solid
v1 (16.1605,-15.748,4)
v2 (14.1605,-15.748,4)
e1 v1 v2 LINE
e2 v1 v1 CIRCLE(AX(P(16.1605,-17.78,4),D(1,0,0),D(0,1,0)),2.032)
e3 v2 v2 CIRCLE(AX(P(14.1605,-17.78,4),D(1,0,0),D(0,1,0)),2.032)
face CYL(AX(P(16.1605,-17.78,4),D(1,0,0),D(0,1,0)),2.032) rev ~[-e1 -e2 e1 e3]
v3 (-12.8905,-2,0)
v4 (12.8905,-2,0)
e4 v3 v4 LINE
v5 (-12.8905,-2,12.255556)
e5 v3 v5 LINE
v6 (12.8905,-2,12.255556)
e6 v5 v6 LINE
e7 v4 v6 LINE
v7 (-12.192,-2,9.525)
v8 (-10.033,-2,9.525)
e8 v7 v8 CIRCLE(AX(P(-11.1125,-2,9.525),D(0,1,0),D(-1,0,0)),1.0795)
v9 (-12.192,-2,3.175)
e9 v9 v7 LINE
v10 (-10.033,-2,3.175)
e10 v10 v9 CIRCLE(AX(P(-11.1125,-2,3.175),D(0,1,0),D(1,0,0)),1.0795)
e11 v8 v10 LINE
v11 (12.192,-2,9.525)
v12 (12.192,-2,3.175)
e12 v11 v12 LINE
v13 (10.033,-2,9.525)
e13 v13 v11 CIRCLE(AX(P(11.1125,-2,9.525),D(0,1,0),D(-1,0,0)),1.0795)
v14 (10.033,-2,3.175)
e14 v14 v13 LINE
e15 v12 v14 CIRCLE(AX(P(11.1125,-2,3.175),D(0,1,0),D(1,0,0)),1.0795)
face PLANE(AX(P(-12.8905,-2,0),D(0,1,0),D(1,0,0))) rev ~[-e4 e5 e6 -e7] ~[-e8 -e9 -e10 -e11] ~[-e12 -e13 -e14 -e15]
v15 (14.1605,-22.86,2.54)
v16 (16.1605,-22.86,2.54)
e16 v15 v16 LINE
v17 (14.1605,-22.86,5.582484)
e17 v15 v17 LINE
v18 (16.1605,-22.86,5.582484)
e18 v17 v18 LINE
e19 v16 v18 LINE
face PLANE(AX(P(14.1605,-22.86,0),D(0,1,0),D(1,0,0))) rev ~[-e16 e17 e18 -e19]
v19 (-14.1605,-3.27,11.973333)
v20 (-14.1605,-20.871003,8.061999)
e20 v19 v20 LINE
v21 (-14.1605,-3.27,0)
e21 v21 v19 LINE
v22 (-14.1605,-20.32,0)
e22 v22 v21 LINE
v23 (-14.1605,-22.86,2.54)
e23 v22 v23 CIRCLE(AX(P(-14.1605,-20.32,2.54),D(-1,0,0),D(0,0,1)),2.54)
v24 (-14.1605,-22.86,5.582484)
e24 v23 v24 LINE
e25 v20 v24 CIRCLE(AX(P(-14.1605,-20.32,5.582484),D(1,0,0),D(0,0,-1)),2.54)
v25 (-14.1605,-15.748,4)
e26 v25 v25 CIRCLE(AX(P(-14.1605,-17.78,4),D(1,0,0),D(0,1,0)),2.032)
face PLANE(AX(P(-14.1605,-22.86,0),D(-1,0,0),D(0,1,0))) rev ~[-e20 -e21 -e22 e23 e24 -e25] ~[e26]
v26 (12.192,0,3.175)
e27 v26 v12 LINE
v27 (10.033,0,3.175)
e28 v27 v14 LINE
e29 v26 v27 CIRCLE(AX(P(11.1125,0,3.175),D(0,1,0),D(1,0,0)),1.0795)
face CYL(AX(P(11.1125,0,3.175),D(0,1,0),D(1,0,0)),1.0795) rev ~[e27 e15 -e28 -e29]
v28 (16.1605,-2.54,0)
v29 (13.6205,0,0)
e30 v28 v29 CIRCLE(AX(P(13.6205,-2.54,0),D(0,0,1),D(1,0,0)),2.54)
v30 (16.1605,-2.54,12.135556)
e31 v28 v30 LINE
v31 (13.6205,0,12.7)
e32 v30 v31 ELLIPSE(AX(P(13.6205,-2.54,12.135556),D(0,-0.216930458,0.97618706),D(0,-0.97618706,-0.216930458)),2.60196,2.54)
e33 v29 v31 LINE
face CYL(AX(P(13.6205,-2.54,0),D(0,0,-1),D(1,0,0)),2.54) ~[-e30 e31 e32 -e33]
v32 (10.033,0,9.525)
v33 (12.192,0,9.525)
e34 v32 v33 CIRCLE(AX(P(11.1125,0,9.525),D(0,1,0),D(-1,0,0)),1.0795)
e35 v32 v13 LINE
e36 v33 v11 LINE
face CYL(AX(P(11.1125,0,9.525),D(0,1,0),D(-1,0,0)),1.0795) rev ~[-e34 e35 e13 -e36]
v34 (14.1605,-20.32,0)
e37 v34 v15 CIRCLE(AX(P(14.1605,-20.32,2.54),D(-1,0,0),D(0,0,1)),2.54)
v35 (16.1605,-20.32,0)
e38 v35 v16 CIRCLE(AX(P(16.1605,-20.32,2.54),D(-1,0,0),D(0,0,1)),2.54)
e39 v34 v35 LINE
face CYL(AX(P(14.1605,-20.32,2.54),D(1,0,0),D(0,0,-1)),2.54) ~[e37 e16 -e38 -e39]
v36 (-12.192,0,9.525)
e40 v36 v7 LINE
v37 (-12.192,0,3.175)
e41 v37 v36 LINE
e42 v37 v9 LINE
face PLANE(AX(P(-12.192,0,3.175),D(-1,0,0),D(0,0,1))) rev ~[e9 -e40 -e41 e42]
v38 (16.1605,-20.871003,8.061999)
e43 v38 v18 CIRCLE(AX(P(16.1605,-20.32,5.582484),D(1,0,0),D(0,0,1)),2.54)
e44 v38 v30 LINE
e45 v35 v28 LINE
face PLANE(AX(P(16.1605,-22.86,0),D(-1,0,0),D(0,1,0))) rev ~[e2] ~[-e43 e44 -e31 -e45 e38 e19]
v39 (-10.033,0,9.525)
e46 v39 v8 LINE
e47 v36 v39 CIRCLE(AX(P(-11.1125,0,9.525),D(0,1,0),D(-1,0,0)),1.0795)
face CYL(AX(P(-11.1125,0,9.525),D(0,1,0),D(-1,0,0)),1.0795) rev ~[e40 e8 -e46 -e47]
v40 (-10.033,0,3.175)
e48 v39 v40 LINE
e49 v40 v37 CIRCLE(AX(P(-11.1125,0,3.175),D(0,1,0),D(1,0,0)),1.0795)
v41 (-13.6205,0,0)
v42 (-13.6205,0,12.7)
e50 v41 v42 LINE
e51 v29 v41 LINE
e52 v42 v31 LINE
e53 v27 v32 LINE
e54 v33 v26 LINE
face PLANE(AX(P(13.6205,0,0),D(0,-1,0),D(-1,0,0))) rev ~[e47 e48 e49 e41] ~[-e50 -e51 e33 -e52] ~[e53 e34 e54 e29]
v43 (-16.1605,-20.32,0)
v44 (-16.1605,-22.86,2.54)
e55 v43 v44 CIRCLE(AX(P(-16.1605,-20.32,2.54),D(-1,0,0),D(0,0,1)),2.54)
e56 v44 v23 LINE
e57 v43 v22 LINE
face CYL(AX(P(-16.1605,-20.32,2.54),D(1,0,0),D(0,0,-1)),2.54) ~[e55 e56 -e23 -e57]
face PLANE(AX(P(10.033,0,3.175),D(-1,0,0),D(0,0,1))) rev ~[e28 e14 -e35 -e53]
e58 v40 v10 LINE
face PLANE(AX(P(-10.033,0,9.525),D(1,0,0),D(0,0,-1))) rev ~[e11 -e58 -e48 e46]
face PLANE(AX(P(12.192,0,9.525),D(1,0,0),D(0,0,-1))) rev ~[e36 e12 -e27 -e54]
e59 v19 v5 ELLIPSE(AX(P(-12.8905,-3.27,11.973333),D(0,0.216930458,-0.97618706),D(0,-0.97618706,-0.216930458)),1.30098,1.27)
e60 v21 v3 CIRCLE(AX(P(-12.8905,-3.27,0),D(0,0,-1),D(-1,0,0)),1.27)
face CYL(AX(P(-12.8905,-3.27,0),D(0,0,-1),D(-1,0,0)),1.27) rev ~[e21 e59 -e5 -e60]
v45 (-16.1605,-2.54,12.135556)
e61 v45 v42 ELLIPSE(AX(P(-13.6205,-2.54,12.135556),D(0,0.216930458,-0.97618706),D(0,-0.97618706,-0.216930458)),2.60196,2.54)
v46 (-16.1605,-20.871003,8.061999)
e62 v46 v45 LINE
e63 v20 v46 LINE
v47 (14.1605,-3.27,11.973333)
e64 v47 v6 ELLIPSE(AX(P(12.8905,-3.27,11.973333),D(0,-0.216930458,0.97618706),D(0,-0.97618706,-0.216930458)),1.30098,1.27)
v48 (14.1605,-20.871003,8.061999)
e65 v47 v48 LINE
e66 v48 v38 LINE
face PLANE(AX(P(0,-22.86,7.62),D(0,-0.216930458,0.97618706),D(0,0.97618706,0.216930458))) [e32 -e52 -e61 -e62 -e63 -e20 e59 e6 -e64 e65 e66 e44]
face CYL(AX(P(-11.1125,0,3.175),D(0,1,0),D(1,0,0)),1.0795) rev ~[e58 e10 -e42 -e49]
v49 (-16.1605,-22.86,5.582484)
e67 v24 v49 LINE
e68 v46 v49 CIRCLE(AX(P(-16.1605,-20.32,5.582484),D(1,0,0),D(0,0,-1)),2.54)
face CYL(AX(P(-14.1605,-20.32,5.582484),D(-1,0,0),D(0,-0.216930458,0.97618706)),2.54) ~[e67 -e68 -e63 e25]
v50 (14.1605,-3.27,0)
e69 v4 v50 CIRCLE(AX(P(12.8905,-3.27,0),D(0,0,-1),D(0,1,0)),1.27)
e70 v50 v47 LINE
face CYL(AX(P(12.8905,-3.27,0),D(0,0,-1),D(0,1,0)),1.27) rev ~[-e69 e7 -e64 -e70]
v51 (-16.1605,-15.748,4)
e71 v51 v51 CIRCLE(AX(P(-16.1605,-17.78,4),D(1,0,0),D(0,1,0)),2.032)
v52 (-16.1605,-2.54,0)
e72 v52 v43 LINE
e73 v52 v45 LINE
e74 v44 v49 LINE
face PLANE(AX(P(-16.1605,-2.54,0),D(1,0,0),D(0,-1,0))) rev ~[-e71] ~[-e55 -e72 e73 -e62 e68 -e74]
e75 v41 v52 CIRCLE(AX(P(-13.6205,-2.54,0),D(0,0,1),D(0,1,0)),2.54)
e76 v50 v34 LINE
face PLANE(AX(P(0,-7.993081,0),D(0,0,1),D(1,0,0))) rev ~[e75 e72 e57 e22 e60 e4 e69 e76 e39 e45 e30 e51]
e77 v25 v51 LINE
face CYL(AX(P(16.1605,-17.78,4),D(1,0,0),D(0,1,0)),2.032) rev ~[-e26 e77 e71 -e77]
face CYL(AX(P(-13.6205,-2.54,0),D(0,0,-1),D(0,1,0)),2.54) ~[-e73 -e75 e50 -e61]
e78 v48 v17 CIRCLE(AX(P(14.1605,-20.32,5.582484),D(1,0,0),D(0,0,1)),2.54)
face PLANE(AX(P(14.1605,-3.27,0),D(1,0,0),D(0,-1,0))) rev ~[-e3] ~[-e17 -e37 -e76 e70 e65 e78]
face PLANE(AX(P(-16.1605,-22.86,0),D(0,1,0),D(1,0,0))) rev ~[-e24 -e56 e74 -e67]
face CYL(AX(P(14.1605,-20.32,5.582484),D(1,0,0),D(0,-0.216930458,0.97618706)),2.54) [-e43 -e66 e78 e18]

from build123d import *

# Parameters (mm, degrees)
F1_DEPTH      = 12.7
F3_DEPTH      = 16.1615
F3_DEPTH_BACK = 16.1615
F4_R          = 2.032
F5_DEPTH      = 32.322
F5_DEPTH_BACK = 60
F6_R          = 2.54
F8_DEPTH      = 22.861


# Not quite as in the source:
# - an extrude ends at something that could not be found from the text; its depth is read off the source's solid
# - a feature names something its author has since deleted; it is built from what else it names


with BuildPart() as f1:
    # F0 (on Top) → F1 (new body)
    with BuildSketch(Plane.XY):
        with BuildLine():
            Line((13.6205, 0), (0, 0))
            Line((0, 0), (-13.6205, 0))
            ThreePointArc((-13.6205, 0), (-15.4165512242, -0.7439487758), (-16.1605, -2.54))
            Line((-16.1605, -2.54), (-16.1605, -22.86))
            Line((-16.1605, -22.86), (-14.1605, -22.86))
            Line((-14.1605, -22.86), (-14.1605, -3.27))
            ThreePointArc((-14.1605, -3.27), (-13.7885256121, -2.3719743879), (-12.8905, -2))
            Line((-12.8905, -2), (0, -2))
            Line((0, -2), (12.8905, -2))
            ThreePointArc((12.8905, -2), (13.7885256121, -2.3719743879), (14.1605, -3.27))
            Line((14.1605, -3.27), (14.1605, -22.86))
            Line((14.1605, -22.86), (16.1605, -22.86))
            Line((16.1605, -22.86), (16.1605, -2.54))
            ThreePointArc((16.1605, -2.54), (15.4165512242, -0.7439487758), (13.6205, 0))
        make_face()
    extrude(amount=F1_DEPTH)

    # F2 (on Right) → F3 (cut, two sides)
    with BuildSketch(Plane.YZ) as f3_sk:
        Polygon((0, 12.7), (-2.54, 12.7), (-22.86, 12.7), (-22.86, 7.62), align=None)
    extrude(amount=-F3_DEPTH, mode=Mode.SUBTRACT)
    extrude(f3_sk.sketch, amount=F3_DEPTH_BACK, mode=Mode.SUBTRACT)

    # F4 (on face) → F5 (cut, two sides)
    with BuildSketch(Plane.YZ.offset(16.1605)) as f5_sk:
        with Locations((-17.78, 4)):
            Circle(F4_R)
    extrude(amount=-F5_DEPTH, mode=Mode.SUBTRACT)
    extrude(f5_sk.sketch, amount=F5_DEPTH_BACK, mode=Mode.SUBTRACT)

    # F6
    f6_edges = [f1.edges().sort_by_distance(p)[0] for p in [
        (15.1605, -22.86, 7.62),
        (-15.1605, -22.86, 7.62),
        (-15.1605, -22.86, 0),
        (15.1605, -22.86, 0),
    ]]
    fillet(f6_edges, radius=F6_R)

    # F7 (on face) → F8 (cut, through all)
    with BuildSketch(Plane(origin=(0, 0, 0), x_dir=(-1, 0, 0), z_dir=(0, 1, 0))):
        with BuildLine():
            Line((-10.033, 3.175), (-10.033, 9.525))
            ThreePointArc((-10.033, 9.525), (-11.1125, 10.6045), (-12.192, 9.525))
            Line((-12.192, 9.525), (-12.192, 3.175))
            ThreePointArc((-12.192, 3.175), (-11.1125, 2.0955), (-10.033, 3.175))
        make_face()
        with BuildLine():
            ThreePointArc((10.033, 3.175), (11.1125, 2.0955), (12.192, 3.175))
            Line((12.192, 3.175), (12.192, 9.525))
            ThreePointArc((12.192, 9.525), (11.1125, 10.6045), (10.033, 9.525))
            Line((10.033, 9.525), (10.033, 3.175))
        make_face()
    extrude(amount=-F8_DEPTH, mode=Mode.SUBTRACT)


solid = f1.part
